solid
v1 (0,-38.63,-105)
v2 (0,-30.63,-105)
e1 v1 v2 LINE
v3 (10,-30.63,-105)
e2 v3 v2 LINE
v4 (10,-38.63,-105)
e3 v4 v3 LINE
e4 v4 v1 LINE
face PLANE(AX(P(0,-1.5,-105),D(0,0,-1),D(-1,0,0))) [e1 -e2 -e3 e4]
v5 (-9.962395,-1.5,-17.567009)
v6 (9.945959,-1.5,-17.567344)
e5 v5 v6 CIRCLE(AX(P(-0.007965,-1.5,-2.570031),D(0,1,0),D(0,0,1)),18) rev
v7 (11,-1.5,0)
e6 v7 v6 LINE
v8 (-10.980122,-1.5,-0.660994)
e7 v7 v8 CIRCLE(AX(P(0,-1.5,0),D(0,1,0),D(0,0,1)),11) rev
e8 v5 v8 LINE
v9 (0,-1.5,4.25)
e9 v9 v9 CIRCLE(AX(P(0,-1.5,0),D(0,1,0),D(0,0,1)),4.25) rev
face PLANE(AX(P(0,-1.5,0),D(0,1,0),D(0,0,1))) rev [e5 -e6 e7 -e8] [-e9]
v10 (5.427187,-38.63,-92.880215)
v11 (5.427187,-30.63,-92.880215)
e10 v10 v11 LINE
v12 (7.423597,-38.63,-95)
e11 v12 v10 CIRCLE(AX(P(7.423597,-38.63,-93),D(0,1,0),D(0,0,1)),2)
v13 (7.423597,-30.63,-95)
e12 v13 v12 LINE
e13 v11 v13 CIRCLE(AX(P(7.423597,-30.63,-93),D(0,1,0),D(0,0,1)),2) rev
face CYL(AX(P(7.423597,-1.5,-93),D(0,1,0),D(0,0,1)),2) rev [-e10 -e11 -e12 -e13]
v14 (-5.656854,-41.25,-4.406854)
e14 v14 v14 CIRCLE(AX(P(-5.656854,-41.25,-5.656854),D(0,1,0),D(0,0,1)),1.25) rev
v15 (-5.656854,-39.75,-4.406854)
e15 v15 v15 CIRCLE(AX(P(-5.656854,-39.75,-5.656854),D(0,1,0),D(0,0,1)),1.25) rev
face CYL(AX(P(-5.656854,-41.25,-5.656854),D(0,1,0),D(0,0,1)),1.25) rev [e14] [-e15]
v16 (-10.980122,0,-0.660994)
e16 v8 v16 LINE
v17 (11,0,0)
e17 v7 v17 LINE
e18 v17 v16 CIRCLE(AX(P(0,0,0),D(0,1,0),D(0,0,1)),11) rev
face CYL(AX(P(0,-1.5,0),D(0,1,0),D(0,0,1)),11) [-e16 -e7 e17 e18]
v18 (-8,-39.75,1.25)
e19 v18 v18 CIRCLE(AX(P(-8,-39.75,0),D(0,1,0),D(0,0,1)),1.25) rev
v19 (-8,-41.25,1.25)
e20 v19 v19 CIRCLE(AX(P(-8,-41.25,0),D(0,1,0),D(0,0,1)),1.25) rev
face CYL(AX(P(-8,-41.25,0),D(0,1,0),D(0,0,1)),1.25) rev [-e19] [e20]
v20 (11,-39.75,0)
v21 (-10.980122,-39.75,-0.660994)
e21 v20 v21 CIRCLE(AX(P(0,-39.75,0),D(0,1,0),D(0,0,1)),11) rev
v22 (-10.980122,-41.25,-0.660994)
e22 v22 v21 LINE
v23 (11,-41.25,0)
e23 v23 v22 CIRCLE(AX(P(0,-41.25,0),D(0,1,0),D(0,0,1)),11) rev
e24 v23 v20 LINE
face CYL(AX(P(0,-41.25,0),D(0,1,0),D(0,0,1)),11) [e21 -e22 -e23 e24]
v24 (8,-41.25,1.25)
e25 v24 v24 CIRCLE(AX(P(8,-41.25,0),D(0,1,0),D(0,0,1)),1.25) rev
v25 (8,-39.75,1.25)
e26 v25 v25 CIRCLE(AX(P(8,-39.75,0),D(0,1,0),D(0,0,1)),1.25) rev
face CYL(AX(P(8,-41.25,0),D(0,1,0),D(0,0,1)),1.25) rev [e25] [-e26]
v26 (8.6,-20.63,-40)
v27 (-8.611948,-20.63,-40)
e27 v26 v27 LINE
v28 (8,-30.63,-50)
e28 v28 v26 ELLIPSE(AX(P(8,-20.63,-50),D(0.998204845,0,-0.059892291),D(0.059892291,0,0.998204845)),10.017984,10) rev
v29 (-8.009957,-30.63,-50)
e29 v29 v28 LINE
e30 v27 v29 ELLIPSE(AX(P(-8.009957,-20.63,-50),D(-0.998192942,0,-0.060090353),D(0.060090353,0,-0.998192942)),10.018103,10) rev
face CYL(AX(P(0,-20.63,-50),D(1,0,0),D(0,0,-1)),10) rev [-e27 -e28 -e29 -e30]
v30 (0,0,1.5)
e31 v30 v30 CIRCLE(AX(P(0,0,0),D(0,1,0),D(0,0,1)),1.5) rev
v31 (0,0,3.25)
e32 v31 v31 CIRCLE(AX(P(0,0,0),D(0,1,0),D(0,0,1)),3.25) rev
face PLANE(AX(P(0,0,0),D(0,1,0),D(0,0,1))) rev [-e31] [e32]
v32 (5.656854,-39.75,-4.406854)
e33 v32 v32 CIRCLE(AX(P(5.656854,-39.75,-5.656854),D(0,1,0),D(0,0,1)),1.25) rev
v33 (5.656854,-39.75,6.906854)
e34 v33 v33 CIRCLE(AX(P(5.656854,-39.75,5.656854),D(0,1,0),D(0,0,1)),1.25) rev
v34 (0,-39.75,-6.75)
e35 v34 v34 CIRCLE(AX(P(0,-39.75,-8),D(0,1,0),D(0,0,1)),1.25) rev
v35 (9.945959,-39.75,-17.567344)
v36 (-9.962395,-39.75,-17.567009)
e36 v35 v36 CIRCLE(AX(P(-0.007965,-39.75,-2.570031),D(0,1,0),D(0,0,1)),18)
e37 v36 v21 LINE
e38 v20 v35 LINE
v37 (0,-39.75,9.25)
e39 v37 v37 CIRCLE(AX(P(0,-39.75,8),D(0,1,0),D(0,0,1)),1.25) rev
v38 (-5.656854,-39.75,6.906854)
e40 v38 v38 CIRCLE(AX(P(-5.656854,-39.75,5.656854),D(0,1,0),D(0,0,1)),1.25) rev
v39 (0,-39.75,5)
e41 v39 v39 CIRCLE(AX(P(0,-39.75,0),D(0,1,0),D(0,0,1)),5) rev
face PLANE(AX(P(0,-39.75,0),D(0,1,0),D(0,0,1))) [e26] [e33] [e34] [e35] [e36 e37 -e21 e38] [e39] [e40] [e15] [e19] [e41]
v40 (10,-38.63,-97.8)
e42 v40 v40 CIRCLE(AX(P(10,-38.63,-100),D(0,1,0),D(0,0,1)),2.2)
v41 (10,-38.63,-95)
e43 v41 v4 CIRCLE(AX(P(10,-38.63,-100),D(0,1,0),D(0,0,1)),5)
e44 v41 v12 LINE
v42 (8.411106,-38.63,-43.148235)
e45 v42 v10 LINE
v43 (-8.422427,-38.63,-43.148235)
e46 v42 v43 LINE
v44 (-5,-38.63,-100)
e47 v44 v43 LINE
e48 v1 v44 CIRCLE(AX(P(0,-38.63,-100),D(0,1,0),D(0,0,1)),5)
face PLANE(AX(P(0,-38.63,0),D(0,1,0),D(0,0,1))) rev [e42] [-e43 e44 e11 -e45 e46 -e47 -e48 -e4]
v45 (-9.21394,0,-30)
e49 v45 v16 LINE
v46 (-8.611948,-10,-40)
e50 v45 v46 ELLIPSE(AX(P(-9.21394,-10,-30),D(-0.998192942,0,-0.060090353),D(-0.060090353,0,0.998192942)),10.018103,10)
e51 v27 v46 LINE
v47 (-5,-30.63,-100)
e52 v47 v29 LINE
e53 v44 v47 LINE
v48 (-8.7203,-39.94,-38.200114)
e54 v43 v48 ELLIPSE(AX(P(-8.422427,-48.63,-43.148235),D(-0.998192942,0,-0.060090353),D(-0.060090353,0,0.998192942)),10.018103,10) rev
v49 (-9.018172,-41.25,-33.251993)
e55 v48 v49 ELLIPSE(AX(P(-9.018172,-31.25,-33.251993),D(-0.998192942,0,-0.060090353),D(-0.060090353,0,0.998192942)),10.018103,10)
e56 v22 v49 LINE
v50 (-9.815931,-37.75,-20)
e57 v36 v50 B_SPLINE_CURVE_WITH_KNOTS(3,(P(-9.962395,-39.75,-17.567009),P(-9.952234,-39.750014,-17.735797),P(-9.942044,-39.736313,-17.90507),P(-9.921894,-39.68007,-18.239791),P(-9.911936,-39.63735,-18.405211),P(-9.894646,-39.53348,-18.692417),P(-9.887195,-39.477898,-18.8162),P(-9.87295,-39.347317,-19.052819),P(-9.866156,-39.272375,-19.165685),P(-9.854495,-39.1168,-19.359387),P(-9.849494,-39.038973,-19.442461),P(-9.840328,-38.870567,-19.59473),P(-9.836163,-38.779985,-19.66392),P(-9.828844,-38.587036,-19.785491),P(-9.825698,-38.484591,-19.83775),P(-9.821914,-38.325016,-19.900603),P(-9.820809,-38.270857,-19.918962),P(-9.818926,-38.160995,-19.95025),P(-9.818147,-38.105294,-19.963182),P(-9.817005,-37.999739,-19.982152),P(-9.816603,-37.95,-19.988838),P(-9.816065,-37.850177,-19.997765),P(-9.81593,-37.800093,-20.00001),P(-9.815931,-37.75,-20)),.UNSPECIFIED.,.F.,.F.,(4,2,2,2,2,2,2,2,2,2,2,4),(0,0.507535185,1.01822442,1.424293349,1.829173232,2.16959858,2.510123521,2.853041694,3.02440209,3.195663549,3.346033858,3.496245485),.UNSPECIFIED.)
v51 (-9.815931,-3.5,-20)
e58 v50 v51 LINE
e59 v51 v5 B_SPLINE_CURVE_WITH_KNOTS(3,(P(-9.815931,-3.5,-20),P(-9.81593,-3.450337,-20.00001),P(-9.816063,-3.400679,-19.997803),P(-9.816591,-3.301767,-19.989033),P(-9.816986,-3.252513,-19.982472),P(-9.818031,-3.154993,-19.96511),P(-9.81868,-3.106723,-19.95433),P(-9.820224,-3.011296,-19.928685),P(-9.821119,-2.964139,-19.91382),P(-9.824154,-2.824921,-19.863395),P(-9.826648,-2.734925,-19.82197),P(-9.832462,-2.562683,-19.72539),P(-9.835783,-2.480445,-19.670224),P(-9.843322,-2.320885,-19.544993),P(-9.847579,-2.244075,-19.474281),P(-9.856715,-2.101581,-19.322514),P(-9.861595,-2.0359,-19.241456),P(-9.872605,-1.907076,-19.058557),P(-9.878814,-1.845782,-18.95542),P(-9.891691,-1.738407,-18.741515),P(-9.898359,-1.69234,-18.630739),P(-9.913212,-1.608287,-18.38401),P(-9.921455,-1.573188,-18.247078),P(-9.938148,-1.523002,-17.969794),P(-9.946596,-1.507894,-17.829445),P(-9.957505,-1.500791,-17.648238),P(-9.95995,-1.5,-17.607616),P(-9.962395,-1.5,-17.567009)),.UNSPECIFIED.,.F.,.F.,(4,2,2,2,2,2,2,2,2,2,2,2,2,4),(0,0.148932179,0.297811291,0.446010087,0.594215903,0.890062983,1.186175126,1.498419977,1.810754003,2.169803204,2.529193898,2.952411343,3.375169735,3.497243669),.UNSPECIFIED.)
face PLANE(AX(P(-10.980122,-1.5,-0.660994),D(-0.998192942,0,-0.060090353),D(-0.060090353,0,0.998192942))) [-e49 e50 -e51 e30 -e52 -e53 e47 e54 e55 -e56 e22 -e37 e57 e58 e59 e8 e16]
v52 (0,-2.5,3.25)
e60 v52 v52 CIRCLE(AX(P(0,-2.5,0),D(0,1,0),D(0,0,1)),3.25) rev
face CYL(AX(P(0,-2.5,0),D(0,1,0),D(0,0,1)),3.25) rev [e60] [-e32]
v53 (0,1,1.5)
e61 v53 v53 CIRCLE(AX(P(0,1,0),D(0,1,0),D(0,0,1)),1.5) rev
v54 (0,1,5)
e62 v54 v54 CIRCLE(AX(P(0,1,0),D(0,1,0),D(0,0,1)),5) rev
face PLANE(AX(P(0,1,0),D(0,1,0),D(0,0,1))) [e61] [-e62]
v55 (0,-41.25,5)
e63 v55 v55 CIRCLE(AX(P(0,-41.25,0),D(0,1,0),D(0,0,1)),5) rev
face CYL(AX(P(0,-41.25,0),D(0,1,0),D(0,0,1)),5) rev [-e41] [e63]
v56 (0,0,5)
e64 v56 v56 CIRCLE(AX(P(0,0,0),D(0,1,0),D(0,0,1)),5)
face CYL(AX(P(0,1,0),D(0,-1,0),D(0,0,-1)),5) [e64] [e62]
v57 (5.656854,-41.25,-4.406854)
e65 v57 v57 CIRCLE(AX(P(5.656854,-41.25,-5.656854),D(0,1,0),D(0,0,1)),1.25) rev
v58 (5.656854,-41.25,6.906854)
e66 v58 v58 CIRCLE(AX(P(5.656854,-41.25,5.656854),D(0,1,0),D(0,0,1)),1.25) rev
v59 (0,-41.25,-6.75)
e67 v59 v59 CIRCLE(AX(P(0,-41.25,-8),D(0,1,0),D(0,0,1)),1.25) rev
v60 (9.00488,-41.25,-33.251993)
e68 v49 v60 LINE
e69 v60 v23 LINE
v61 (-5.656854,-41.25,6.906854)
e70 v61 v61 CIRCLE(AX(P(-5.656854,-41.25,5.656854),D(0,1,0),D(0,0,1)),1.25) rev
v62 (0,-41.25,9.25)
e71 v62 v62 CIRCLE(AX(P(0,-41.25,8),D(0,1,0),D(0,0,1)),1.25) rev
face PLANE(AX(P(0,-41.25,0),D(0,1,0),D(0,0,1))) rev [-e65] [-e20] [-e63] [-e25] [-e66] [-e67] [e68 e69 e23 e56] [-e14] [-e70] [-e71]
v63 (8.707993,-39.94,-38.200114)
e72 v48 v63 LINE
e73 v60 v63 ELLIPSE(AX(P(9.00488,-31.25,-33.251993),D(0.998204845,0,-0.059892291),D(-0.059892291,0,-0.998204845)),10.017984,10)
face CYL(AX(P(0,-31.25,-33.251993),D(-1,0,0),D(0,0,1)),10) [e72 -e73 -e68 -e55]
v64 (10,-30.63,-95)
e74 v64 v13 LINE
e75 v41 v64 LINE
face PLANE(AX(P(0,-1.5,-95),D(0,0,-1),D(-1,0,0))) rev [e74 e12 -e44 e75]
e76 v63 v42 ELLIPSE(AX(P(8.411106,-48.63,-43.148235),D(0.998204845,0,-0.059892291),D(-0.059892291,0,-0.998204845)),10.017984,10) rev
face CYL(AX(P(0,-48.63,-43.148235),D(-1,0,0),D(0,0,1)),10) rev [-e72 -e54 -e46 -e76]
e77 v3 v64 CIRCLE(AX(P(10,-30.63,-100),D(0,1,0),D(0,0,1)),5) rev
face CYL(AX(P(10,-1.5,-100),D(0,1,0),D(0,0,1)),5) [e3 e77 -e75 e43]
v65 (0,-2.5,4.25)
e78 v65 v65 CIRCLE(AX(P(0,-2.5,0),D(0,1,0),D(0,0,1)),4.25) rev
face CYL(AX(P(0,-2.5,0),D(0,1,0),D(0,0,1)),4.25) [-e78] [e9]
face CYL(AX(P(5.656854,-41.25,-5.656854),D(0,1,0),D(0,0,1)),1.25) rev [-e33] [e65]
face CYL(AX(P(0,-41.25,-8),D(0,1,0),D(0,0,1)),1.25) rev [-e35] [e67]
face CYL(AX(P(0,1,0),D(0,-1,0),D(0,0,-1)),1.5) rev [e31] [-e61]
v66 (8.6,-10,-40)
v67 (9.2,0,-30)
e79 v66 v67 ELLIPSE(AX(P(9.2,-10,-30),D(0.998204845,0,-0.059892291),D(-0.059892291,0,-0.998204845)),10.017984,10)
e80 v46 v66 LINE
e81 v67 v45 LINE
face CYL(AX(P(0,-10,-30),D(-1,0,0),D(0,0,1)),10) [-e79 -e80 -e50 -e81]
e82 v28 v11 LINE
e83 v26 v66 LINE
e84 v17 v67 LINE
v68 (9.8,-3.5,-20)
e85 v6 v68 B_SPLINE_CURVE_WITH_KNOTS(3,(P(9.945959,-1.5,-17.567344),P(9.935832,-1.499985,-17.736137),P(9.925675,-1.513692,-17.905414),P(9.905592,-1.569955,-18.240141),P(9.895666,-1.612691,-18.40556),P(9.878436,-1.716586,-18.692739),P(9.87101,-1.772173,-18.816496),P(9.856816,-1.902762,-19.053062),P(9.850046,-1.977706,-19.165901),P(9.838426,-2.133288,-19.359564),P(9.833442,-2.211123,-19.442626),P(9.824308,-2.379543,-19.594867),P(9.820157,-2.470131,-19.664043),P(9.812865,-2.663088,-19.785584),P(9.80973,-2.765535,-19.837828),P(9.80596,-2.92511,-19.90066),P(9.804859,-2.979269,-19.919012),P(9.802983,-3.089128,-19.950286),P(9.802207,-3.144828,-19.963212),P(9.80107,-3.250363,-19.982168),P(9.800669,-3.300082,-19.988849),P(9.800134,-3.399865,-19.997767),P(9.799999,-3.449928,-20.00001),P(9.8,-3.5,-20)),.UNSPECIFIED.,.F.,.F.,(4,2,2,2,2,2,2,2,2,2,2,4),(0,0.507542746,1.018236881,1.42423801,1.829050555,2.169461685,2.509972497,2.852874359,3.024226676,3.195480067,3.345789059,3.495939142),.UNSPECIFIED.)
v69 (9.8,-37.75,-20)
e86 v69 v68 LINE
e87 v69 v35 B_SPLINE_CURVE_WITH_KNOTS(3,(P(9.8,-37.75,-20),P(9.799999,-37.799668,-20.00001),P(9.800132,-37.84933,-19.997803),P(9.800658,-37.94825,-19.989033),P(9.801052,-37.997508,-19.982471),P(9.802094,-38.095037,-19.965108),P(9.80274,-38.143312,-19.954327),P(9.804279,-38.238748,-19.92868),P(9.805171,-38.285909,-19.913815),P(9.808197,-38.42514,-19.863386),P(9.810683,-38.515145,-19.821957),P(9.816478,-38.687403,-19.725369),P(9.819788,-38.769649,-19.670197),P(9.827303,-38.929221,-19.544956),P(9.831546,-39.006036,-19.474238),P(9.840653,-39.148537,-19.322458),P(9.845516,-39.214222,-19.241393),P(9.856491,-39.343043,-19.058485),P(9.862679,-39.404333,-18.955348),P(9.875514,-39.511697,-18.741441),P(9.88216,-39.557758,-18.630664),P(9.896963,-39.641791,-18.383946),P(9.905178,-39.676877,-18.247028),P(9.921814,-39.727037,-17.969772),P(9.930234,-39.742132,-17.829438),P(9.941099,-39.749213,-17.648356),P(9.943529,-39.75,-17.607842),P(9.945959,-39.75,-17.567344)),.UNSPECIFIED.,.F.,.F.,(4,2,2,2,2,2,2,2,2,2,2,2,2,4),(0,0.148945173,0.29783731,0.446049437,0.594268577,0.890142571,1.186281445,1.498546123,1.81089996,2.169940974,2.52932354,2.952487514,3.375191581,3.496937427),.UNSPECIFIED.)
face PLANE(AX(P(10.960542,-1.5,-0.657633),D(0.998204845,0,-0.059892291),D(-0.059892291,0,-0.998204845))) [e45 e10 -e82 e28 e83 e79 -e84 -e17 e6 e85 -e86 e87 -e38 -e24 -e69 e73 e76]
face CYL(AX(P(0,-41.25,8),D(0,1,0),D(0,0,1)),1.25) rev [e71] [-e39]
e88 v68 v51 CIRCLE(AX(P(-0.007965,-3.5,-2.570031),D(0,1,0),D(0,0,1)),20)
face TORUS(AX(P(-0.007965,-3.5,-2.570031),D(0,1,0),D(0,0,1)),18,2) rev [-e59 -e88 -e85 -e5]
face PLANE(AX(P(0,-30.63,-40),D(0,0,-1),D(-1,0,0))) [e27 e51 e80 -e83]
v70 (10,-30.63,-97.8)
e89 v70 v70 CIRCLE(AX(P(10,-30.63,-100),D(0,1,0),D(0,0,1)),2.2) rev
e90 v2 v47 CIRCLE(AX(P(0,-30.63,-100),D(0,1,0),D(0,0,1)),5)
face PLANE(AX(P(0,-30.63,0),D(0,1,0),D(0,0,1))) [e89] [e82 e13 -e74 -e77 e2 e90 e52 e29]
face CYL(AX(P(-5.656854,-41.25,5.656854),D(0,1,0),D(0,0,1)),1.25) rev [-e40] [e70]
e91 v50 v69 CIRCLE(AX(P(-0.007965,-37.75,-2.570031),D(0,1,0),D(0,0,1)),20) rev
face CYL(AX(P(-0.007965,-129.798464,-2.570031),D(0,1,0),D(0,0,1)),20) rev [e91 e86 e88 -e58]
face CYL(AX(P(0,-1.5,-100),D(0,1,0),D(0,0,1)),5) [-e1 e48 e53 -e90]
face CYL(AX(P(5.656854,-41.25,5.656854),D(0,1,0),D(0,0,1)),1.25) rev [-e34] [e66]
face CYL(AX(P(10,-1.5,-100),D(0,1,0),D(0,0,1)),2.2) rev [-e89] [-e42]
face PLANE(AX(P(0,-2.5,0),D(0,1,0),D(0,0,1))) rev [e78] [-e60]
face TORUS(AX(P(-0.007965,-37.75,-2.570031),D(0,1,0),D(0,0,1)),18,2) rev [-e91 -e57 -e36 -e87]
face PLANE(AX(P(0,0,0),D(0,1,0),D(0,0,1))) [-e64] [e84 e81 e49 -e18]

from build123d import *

# Parameters (mm, degrees)
SKETCH3_R           = 4.249999999999999
SKETCH3_R_2         = 2.1999999999999984
BOSS_EXTRUDE2_DEPTH = 1.5
SKETCH3_18_R        = 5
SKETCH3_18_R_2      = 1.5
BOSS_EXTRUDE3_DEPTH = 1
SKETCH3_19_R        = 4.249999999999999
SKETCH3_19_R_2      = 3.250000000000001
BOSS_EXTRUDE4_DEPTH = 2.5
BOSS_EXTRUDE5_START = 39.75
SKETCH3_20_R        = 5
SKETCH3_20_R_2      = 1.2500000000000002
SKETCH3_20_R_3      = 1.2499999999999998
SKETCH3_20_R_4      = 1.2499999999999991
SKETCH3_20_R_5      = 1.2500000000000004
SKETCH3_20_R_6      = 2.1999999999999984
BOSS_EXTRUDE5_DEPTH = 1.5
SKETCH3_21_R        = 2.1999999999999984
BOSS_EXTRUDE6_DEPTH = 41.25
SKETCH3_23_R        = 2.1999999999999984
CUT_EXTRUDE7_DEPTH  = 30.63
CUT_EXTRUDE8_START  = 38.63
SKETCH3_24_R        = 2.1999999999999984
CUT_EXTRUDE8_DEPTH  = 2.62
FILLET5_R           = 10
FILLET6_R           = 10
FILLET7_R           = 2


with BuildPart() as part:
    # Sketch3 → Boss-Extrude2 (new body)
    with BuildSketch(Plane(origin=(0, 0, 0), x_dir=(-1, 0, 0), z_dir=(0, -1, 0))):
        with BuildLine():
            Line((5.000000000000005, 100), (10.980122362164348, 0.6609938818917814))
            ThreePointArc((10.980122362164348, 0.6609938818917814), (0.3306463489834291, -10.995029467532314), (-11, 0))
            Line((-11, 0), (-5.300000000000002, 95.00000000000001))
            Line((-5.300000000000002, 95.00000000000001), (-9.999999999999998, 95.00000000000003))
            ThreePointArc((-9.999999999999998, 95.00000000000003), (-15.00000000000001, 100.00000000000003), (-9.999999999999996, 105.00000000000004))
            Line((-9.999999999999996, 105.00000000000004), (5.6e-16, 105.00000000000003))
            ThreePointArc((5.6e-16, 105.00000000000003), (3.5355339059327497, 103.53553390593275), (5.000000000000005, 100))
        make_face()
        with Locations(Location((0, 0, 0), (0, 0, 270))):
            Circle(SKETCH3_R, mode=Mode.SUBTRACT)
        with Locations(Location((-9.999999999999998, 100.00000000000003, 0), (0, 0, 270))):
            Circle(SKETCH3_R_2, mode=Mode.SUBTRACT)
    extrude(amount=BOSS_EXTRUDE2_DEPTH)

    # Sketch3<18> → Boss-Extrude3 (add)
    with BuildSketch(Plane(origin=(0, 0, 0), x_dir=(-1, 0, 0), z_dir=(0, -1, 0))):
        with Locations(Location((0, 0, 0), (0, 0, 270))):
            Circle(SKETCH3_18_R)
        with Locations(Location((0, 0, 0), (0, 0, 270))):
            Circle(SKETCH3_18_R_2, mode=Mode.SUBTRACT)
    extrude(amount=-BOSS_EXTRUDE3_DEPTH)

    # Sketch3<19> → Boss-Extrude4 (add)
    with BuildSketch(Plane(origin=(0, 0, 0), x_dir=(-1, 0, 0), z_dir=(0, -1, 0))):
        with Locations(Location((0, 0, 0), (0, 0, 270))):
            Circle(SKETCH3_19_R)
        with Locations(Location((0, 0, 0), (0, 0, 270))):
            Circle(SKETCH3_19_R_2, mode=Mode.SUBTRACT)
    extrude(amount=BOSS_EXTRUDE4_DEPTH)



with BuildPart() as body_2:
    # Sketch3<20> → Boss-Extrude5 (new body)
    with BuildSketch(Plane(origin=(0, 0, 0), x_dir=(-1, 0, 0), z_dir=(0, -1, 0)).offset(BOSS_EXTRUDE5_START)):
        with BuildLine():
            Line((5.000000000000005, 100), (10.980122362164348, 0.6609938818917814))
            ThreePointArc((10.980122362164348, 0.6609938818917814), (0.3306463489834291, -10.995029467532314), (-11, 0))
            Line((-11, 0), (-5.300000000000002, 95.00000000000001))
            Line((-5.300000000000002, 95.00000000000001), (-9.999999999999998, 95.00000000000003))
            ThreePointArc((-9.999999999999998, 95.00000000000003), (-15.00000000000001, 100.00000000000003), (-9.999999999999996, 105.00000000000004))
            Line((-9.999999999999996, 105.00000000000004), (5.6e-16, 105.00000000000003))
            ThreePointArc((5.6e-16, 105.00000000000003), (3.5355339059327497, 103.53553390593275), (5.000000000000005, 100))
        make_face()
        with Locations(Location((0, 0, 0), (0, 0, 270))):
            Circle(SKETCH3_20_R, mode=Mode.SUBTRACT)
        with Locations(Location((-8, 0, 0), (0, 0, 270))):
            Circle(SKETCH3_20_R_2, mode=Mode.SUBTRACT)
        with Locations(Location((-5.65685424949238, 5.656854249492384, 0), (0, 0, 270))):
            Circle(SKETCH3_20_R_2, mode=Mode.SUBTRACT)
        with Locations(Location((0, 8.000000000000007, 0), (0, 0, 270))):
            Circle(SKETCH3_20_R_3, mode=Mode.SUBTRACT)
        with Locations(Location((5.656854249492385, 5.656854249492391, 0), (0, 0, 270))):
            Circle(SKETCH3_20_R_2, mode=Mode.SUBTRACT)
        with Locations(Location((8.000000000000009, 9.11e-15, 0), (0, 0, 270))):
            Circle(SKETCH3_20_R_4, mode=Mode.SUBTRACT)
        with Locations(Location((5.656854249492392, -5.656854249492377, 0), (0, 0, 270))):
            Circle(SKETCH3_20_R_2, mode=Mode.SUBTRACT)
        with Locations(Location((1.019e-14, -8, 0), (0, 0, 270))):
            Circle(SKETCH3_20_R_5, mode=Mode.SUBTRACT)
        with Locations(Location((-5.656854249492376, -5.656854249492382, 0), (0, 0, 270))):
            Circle(SKETCH3_20_R_2, mode=Mode.SUBTRACT)
        with Locations(Location((-9.999999999999998, 100.00000000000003, 0), (0, 0, 270))):
            Circle(SKETCH3_20_R_6, mode=Mode.SUBTRACT)
    extrude(amount=BOSS_EXTRUDE5_DEPTH)


with BuildPart() as part_1:
    add(part.part)

    add(body_2.part)  # Boss-Extrude6 merges body 2
    # Sketch3<21> → Boss-Extrude6 (add)
    with BuildSketch(Plane(origin=(0, 0, 0), x_dir=(-1, 0, 0), z_dir=(0, -1, 0))):
        with BuildLine():
            ThreePointArc((5.000000000000007, 100), (3.5355339059327426, 103.53553390593274), (6e-17, 105))
            Line((0, 105.00000000000003), (-9.999999999999996, 105.00000000000004))
            ThreePointArc((-9.999999999999996, 105.00000000000003), (-15.000000000000014, 100.00000000000003), (-9.999999999999998, 95.00000000000003))
            Line((-9.999999999999998, 95.00000000000003), (-5.300000000000002, 95.00000000000001))
            Line((-5.300000000000002, 95.00000000000001), (-9.800000000000002, 20))
            ThreePointArc((-9.800000000000002, 20), (0.00796544916277364, 22.5700311604401), (9.815930898325552, 19.999999999999996))
            Line((9.815930898325552, 19.999999999999996), (5.000000000000004, 100))
        make_face()
        with Locations(Location((-9.999999999999998, 100.00000000000003, 0), (0, 0, 270))):
            Circle(SKETCH3_21_R, mode=Mode.SUBTRACT)
    extrude(amount=BOSS_EXTRUDE6_DEPTH)

    # Sketch3<23> → Cut-Extrude7 (cut)
    with BuildSketch(Plane(origin=(0, 0, 0), x_dir=(-1, 0, 0), z_dir=(0, -1, 0))):
        with BuildLine():
            Line((8.611948173744162, 40), (5.000000000000005, 100))
            ThreePointArc((5.000000000000002, 100), (3.5355339059327484, 103.53553390593275), (5.6e-16, 105.00000000000003))
            Line((0, 105.00000000000003), (-9.999999999999996, 105.00000000000004))
            ThreePointArc((-9.999999999999996, 105.00000000000003), (-15.000000000000014, 100.00000000000003), (-9.999999999999998, 95.00000000000003))
            Line((-9.999999999999998, 95.00000000000003), (-5.300000000000002, 95.00000000000001))
            Line((-5.300000000000002, 95.00000000000001), (-8.600000000000001, 40.00000000000001))
            Line((-8.600000000000003, 40), (8.611948173744162, 40))
        make_face()
        with Locations(Location((-9.999999999999998, 100.00000000000003, 0), (0, 0, 270))):
            Circle(SKETCH3_23_R, mode=Mode.SUBTRACT)
    extrude(amount=CUT_EXTRUDE7_DEPTH, mode=Mode.SUBTRACT)

    # Sketch3<24> → Cut-Extrude8 (cut)
    with BuildSketch(Plane(origin=(0, 0, 0), x_dir=(-1, 0, 0), z_dir=(0, -1, 0)).offset(CUT_EXTRUDE8_START)):
        with BuildLine():
            Line((8.611948173744162, 40), (5.000000000000005, 100))
            ThreePointArc((5.000000000000002, 100), (3.5355339059327484, 103.53553390593275), (5.6e-16, 105.00000000000003))
            Line((0, 105.00000000000003), (-9.999999999999996, 105.00000000000004))
            ThreePointArc((-9.999999999999996, 105.00000000000003), (-15.000000000000014, 100.00000000000003), (-9.999999999999998, 95.00000000000003))
            Line((-9.999999999999998, 95.00000000000003), (-5.300000000000002, 95.00000000000001))
            Line((-5.300000000000002, 95.00000000000001), (-8.600000000000001, 40.00000000000001))
            Line((-8.600000000000003, 40), (8.611948173744162, 40))
        make_face()
        with Locations(Location((-9.999999999999998, 100.00000000000003, 0), (0, 0, 270))):
            Circle(SKETCH3_24_R, mode=Mode.SUBTRACT)
    extrude(amount=CUT_EXTRUDE8_DEPTH, mode=Mode.SUBTRACT)

    # Fillet5
    # the kernel refuses this fillet: 10 mm, written as the material it takes off along each edge
    with BuildSketch(Plane(origin=(33.6, 0, -40), x_dir=(0, -1, 0), z_dir=(-1, 0, 0))) as fillet5_piece_1:
        with BuildLine():
            CenterArc((FILLET5_R, FILLET5_R), FILLET5_R, 180, 90)
            Line((-1.78e-15, FILLET5_R), (-FILLET5_R * 0.02, FILLET5_R))
            Line((-FILLET5_R * 0.02, FILLET5_R), (-FILLET5_R * 0.02, -FILLET5_R * 0.02))
            Line((-FILLET5_R * 0.02, -FILLET5_R * 0.02), (FILLET5_R, -FILLET5_R * 0.02))
            Line((FILLET5_R, -FILLET5_R * 0.02), (FILLET5_R, 0))
        make_face()
    extrude(amount=67.21194817374416, mode=Mode.SUBTRACT)
    with BuildSketch(Plane(origin=(25.470017783037456, -41.25, -40), x_dir=(0, 1, 0), z_dir=(-1, 0, 0))) as fillet5_piece_2:
        with BuildLine():
            CenterArc((10, -6.748007113214982), FILLET5_R, 137.5613237933639, 42.4386762066361)
            Line((0, -6.748007113214982), (-0.20000000000000284, -6.748007113214982))
            Line((-0.20000000000000284, -6.748007113214982), (-0.20000000000000284, 0))
            Line((-0.20000000000000284, 0), (0, 0.20000000000000284))
            ThreePointArc((0, 0.20000000000000284), (1.3100000000000023, 0.20000000000000284), (2.4724000000000004, 0.13496014226429764))
            Line((2.4724000000000004, 0.13496014226429764), (2.6199999999999974, 0))
        make_face()
    extrude(amount=50.95198373981907, mode=Mode.SUBTRACT)

    # Fillet6
    fillet6_edges = [part_1.edges().sort_by_distance(p)[0] for p in [
        (-0.00597408687207945, -30.63, -40),
        (-0.00597408687207945, -38.63, -40),
    ]]
    fillet(fillet6_edges, radius=FILLET6_R)

    # Fillet7
    fillet7_edges = [part_1.edges().sort_by_distance(p)[0] for p in [
        (5.300000000000002, -34.63, -95.00000000000001),
        (-0.00796544916277897, -1.5, -22.570031160440095),
        (-0.00796544916277897, -39.75, -22.570031160440095),
    ]]
    fillet(fillet7_edges, radius=FILLET7_R)


solid = part_1.part
